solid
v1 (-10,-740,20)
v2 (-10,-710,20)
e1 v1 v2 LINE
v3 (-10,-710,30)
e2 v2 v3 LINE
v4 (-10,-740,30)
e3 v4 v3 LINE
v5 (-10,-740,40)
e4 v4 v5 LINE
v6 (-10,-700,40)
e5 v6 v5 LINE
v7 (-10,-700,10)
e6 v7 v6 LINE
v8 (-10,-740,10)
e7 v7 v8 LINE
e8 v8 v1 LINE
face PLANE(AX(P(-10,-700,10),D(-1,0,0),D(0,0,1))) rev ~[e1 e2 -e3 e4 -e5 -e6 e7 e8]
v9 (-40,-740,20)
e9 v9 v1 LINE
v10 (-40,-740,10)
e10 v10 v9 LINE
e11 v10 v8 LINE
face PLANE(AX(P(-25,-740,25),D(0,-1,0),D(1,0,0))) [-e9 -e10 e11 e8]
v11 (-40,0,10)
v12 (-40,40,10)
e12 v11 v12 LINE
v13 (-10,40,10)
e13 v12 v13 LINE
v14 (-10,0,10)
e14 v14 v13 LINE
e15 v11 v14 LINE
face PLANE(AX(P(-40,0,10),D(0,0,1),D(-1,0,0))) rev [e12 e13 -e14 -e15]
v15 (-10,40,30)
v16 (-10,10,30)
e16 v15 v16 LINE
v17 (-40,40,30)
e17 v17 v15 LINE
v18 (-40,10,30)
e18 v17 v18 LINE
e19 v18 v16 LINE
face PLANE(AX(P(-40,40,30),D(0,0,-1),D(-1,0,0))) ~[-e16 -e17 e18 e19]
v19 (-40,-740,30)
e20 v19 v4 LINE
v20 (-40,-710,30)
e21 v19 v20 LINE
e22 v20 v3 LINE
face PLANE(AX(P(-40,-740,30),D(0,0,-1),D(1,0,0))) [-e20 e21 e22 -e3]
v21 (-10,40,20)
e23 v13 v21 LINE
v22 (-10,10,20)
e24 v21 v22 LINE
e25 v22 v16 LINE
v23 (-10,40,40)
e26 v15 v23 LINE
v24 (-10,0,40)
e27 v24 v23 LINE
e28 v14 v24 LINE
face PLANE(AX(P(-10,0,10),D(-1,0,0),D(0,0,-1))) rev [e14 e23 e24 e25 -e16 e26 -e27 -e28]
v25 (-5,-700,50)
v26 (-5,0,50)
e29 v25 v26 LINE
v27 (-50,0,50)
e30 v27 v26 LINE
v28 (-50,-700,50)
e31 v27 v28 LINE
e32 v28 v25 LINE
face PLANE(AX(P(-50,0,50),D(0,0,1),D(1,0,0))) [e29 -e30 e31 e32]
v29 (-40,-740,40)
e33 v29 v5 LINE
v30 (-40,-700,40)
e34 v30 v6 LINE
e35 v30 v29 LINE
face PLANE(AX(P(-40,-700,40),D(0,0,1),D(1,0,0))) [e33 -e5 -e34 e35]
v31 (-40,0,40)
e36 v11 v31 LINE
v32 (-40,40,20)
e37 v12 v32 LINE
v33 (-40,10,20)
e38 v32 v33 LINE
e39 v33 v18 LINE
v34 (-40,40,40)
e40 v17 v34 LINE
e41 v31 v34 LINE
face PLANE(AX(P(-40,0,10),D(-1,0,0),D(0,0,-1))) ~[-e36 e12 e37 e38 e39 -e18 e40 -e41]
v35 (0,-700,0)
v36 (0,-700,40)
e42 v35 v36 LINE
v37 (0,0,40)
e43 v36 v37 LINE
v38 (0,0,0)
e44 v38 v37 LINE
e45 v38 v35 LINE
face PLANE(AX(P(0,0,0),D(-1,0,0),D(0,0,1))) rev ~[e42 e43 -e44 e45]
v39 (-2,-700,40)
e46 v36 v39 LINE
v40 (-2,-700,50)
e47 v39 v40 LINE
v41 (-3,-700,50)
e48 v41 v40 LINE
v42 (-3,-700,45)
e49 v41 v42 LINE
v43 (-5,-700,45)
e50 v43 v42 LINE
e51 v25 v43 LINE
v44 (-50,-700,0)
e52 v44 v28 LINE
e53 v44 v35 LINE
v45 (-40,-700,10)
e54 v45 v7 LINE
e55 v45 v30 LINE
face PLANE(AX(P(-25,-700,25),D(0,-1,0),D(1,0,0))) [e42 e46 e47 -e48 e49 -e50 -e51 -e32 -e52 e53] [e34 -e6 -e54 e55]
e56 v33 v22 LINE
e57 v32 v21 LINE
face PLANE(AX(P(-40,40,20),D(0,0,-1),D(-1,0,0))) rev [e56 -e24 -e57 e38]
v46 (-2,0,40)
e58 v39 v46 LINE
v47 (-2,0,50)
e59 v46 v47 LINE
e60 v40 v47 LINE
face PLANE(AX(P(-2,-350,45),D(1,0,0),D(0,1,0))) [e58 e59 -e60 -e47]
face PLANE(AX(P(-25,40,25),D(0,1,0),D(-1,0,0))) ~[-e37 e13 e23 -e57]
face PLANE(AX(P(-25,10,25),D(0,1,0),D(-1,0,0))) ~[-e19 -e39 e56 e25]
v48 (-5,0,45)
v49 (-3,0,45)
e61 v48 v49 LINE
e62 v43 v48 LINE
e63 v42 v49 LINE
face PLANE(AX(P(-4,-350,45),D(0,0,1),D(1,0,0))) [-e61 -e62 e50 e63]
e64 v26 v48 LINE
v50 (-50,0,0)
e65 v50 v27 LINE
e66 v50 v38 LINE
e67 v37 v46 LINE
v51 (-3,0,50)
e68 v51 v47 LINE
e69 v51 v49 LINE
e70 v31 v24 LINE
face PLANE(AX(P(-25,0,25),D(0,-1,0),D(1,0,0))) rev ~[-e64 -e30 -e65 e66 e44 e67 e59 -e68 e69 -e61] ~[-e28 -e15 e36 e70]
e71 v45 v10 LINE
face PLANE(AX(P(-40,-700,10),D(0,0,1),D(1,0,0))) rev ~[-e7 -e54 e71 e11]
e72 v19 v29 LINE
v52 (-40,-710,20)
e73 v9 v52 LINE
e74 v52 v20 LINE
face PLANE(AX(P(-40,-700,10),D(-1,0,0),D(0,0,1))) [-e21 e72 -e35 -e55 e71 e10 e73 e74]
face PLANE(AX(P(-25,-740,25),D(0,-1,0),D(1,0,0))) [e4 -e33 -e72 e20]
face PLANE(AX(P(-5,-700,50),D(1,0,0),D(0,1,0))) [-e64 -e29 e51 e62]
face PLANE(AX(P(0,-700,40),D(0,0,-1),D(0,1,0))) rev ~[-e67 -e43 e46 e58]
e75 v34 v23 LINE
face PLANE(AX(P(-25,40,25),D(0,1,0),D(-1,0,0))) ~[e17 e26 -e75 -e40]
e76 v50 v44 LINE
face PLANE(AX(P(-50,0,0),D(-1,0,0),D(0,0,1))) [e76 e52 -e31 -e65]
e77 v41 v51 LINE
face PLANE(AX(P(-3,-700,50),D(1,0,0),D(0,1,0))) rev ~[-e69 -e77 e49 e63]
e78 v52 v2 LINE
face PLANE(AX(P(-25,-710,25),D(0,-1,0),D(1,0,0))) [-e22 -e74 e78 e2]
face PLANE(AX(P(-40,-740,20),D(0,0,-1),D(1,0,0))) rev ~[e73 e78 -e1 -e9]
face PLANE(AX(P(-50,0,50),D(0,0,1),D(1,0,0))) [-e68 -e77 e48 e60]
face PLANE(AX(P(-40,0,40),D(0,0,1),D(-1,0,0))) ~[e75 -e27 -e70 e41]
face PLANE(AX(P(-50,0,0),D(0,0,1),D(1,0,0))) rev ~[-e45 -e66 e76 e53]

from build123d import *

# Parameters (mm, degrees)
F0_W      = 50
F0_H      = 50
F1_DEPTH  = 700
F3_W      = 30
F3_H      = 30
F4_DEPTH  = 40
F5_W      = 30
F5_H      = 10
F6_DEPTH  = 30
F7_W      = 700
F7_H      = 10
F8_DEPTH  = 2
F9_W      = 2
F9_H      = 700
F10_DEPTH = 5


# Not quite as in the source:
# - a pattern or mirror of a feature is missing from the dataset's text; its kind, count and spacing are read off the source's solid


with BuildPart() as f1:
    # F0 (on Front) → F1 (new body)
    with BuildSketch(Plane.XZ):
        with Locations((-25, 25)):
            Rectangle(F0_W, F0_H)
    extrude(amount=F1_DEPTH)

    # F3 (on face) → F4 (join)
    with BuildSketch(Plane.XZ.offset(700)):
        with Locations((-25, 25)):
            Rectangle(F3_W, F3_H)
    f4 = extrude(amount=F4_DEPTH)

    # F4_copies: F4 across plane
    add(f4.mirror(Plane.ZX.offset(-350)))

    # F5 (on face) → F6 (cut)
    with BuildSketch(Plane.XZ.offset(740)):
        with Locations((-25, 25)):
            Rectangle(F5_W, F5_H)
    f6 = extrude(amount=-F6_DEPTH, mode=Mode.SUBTRACT)

    # F6_copies: F6 across plane
    add(f6.mirror(Plane.ZX.offset(-350)), mode=Mode.SUBTRACT)

    # F7 (on face) → F8 (cut)
    with BuildSketch(Plane.YZ):
        with Locations((-350, 45)):
            Rectangle(F7_W, F7_H)
    extrude(amount=-F8_DEPTH, mode=Mode.SUBTRACT)

    # F9 (on face) → F10 (cut)
    with BuildSketch(Plane.XY.offset(50)):
        with Locations((-4, -350)):
            Rectangle(F9_W, F9_H)
    extrude(amount=-F10_DEPTH, mode=Mode.SUBTRACT)


solid = f1.part
